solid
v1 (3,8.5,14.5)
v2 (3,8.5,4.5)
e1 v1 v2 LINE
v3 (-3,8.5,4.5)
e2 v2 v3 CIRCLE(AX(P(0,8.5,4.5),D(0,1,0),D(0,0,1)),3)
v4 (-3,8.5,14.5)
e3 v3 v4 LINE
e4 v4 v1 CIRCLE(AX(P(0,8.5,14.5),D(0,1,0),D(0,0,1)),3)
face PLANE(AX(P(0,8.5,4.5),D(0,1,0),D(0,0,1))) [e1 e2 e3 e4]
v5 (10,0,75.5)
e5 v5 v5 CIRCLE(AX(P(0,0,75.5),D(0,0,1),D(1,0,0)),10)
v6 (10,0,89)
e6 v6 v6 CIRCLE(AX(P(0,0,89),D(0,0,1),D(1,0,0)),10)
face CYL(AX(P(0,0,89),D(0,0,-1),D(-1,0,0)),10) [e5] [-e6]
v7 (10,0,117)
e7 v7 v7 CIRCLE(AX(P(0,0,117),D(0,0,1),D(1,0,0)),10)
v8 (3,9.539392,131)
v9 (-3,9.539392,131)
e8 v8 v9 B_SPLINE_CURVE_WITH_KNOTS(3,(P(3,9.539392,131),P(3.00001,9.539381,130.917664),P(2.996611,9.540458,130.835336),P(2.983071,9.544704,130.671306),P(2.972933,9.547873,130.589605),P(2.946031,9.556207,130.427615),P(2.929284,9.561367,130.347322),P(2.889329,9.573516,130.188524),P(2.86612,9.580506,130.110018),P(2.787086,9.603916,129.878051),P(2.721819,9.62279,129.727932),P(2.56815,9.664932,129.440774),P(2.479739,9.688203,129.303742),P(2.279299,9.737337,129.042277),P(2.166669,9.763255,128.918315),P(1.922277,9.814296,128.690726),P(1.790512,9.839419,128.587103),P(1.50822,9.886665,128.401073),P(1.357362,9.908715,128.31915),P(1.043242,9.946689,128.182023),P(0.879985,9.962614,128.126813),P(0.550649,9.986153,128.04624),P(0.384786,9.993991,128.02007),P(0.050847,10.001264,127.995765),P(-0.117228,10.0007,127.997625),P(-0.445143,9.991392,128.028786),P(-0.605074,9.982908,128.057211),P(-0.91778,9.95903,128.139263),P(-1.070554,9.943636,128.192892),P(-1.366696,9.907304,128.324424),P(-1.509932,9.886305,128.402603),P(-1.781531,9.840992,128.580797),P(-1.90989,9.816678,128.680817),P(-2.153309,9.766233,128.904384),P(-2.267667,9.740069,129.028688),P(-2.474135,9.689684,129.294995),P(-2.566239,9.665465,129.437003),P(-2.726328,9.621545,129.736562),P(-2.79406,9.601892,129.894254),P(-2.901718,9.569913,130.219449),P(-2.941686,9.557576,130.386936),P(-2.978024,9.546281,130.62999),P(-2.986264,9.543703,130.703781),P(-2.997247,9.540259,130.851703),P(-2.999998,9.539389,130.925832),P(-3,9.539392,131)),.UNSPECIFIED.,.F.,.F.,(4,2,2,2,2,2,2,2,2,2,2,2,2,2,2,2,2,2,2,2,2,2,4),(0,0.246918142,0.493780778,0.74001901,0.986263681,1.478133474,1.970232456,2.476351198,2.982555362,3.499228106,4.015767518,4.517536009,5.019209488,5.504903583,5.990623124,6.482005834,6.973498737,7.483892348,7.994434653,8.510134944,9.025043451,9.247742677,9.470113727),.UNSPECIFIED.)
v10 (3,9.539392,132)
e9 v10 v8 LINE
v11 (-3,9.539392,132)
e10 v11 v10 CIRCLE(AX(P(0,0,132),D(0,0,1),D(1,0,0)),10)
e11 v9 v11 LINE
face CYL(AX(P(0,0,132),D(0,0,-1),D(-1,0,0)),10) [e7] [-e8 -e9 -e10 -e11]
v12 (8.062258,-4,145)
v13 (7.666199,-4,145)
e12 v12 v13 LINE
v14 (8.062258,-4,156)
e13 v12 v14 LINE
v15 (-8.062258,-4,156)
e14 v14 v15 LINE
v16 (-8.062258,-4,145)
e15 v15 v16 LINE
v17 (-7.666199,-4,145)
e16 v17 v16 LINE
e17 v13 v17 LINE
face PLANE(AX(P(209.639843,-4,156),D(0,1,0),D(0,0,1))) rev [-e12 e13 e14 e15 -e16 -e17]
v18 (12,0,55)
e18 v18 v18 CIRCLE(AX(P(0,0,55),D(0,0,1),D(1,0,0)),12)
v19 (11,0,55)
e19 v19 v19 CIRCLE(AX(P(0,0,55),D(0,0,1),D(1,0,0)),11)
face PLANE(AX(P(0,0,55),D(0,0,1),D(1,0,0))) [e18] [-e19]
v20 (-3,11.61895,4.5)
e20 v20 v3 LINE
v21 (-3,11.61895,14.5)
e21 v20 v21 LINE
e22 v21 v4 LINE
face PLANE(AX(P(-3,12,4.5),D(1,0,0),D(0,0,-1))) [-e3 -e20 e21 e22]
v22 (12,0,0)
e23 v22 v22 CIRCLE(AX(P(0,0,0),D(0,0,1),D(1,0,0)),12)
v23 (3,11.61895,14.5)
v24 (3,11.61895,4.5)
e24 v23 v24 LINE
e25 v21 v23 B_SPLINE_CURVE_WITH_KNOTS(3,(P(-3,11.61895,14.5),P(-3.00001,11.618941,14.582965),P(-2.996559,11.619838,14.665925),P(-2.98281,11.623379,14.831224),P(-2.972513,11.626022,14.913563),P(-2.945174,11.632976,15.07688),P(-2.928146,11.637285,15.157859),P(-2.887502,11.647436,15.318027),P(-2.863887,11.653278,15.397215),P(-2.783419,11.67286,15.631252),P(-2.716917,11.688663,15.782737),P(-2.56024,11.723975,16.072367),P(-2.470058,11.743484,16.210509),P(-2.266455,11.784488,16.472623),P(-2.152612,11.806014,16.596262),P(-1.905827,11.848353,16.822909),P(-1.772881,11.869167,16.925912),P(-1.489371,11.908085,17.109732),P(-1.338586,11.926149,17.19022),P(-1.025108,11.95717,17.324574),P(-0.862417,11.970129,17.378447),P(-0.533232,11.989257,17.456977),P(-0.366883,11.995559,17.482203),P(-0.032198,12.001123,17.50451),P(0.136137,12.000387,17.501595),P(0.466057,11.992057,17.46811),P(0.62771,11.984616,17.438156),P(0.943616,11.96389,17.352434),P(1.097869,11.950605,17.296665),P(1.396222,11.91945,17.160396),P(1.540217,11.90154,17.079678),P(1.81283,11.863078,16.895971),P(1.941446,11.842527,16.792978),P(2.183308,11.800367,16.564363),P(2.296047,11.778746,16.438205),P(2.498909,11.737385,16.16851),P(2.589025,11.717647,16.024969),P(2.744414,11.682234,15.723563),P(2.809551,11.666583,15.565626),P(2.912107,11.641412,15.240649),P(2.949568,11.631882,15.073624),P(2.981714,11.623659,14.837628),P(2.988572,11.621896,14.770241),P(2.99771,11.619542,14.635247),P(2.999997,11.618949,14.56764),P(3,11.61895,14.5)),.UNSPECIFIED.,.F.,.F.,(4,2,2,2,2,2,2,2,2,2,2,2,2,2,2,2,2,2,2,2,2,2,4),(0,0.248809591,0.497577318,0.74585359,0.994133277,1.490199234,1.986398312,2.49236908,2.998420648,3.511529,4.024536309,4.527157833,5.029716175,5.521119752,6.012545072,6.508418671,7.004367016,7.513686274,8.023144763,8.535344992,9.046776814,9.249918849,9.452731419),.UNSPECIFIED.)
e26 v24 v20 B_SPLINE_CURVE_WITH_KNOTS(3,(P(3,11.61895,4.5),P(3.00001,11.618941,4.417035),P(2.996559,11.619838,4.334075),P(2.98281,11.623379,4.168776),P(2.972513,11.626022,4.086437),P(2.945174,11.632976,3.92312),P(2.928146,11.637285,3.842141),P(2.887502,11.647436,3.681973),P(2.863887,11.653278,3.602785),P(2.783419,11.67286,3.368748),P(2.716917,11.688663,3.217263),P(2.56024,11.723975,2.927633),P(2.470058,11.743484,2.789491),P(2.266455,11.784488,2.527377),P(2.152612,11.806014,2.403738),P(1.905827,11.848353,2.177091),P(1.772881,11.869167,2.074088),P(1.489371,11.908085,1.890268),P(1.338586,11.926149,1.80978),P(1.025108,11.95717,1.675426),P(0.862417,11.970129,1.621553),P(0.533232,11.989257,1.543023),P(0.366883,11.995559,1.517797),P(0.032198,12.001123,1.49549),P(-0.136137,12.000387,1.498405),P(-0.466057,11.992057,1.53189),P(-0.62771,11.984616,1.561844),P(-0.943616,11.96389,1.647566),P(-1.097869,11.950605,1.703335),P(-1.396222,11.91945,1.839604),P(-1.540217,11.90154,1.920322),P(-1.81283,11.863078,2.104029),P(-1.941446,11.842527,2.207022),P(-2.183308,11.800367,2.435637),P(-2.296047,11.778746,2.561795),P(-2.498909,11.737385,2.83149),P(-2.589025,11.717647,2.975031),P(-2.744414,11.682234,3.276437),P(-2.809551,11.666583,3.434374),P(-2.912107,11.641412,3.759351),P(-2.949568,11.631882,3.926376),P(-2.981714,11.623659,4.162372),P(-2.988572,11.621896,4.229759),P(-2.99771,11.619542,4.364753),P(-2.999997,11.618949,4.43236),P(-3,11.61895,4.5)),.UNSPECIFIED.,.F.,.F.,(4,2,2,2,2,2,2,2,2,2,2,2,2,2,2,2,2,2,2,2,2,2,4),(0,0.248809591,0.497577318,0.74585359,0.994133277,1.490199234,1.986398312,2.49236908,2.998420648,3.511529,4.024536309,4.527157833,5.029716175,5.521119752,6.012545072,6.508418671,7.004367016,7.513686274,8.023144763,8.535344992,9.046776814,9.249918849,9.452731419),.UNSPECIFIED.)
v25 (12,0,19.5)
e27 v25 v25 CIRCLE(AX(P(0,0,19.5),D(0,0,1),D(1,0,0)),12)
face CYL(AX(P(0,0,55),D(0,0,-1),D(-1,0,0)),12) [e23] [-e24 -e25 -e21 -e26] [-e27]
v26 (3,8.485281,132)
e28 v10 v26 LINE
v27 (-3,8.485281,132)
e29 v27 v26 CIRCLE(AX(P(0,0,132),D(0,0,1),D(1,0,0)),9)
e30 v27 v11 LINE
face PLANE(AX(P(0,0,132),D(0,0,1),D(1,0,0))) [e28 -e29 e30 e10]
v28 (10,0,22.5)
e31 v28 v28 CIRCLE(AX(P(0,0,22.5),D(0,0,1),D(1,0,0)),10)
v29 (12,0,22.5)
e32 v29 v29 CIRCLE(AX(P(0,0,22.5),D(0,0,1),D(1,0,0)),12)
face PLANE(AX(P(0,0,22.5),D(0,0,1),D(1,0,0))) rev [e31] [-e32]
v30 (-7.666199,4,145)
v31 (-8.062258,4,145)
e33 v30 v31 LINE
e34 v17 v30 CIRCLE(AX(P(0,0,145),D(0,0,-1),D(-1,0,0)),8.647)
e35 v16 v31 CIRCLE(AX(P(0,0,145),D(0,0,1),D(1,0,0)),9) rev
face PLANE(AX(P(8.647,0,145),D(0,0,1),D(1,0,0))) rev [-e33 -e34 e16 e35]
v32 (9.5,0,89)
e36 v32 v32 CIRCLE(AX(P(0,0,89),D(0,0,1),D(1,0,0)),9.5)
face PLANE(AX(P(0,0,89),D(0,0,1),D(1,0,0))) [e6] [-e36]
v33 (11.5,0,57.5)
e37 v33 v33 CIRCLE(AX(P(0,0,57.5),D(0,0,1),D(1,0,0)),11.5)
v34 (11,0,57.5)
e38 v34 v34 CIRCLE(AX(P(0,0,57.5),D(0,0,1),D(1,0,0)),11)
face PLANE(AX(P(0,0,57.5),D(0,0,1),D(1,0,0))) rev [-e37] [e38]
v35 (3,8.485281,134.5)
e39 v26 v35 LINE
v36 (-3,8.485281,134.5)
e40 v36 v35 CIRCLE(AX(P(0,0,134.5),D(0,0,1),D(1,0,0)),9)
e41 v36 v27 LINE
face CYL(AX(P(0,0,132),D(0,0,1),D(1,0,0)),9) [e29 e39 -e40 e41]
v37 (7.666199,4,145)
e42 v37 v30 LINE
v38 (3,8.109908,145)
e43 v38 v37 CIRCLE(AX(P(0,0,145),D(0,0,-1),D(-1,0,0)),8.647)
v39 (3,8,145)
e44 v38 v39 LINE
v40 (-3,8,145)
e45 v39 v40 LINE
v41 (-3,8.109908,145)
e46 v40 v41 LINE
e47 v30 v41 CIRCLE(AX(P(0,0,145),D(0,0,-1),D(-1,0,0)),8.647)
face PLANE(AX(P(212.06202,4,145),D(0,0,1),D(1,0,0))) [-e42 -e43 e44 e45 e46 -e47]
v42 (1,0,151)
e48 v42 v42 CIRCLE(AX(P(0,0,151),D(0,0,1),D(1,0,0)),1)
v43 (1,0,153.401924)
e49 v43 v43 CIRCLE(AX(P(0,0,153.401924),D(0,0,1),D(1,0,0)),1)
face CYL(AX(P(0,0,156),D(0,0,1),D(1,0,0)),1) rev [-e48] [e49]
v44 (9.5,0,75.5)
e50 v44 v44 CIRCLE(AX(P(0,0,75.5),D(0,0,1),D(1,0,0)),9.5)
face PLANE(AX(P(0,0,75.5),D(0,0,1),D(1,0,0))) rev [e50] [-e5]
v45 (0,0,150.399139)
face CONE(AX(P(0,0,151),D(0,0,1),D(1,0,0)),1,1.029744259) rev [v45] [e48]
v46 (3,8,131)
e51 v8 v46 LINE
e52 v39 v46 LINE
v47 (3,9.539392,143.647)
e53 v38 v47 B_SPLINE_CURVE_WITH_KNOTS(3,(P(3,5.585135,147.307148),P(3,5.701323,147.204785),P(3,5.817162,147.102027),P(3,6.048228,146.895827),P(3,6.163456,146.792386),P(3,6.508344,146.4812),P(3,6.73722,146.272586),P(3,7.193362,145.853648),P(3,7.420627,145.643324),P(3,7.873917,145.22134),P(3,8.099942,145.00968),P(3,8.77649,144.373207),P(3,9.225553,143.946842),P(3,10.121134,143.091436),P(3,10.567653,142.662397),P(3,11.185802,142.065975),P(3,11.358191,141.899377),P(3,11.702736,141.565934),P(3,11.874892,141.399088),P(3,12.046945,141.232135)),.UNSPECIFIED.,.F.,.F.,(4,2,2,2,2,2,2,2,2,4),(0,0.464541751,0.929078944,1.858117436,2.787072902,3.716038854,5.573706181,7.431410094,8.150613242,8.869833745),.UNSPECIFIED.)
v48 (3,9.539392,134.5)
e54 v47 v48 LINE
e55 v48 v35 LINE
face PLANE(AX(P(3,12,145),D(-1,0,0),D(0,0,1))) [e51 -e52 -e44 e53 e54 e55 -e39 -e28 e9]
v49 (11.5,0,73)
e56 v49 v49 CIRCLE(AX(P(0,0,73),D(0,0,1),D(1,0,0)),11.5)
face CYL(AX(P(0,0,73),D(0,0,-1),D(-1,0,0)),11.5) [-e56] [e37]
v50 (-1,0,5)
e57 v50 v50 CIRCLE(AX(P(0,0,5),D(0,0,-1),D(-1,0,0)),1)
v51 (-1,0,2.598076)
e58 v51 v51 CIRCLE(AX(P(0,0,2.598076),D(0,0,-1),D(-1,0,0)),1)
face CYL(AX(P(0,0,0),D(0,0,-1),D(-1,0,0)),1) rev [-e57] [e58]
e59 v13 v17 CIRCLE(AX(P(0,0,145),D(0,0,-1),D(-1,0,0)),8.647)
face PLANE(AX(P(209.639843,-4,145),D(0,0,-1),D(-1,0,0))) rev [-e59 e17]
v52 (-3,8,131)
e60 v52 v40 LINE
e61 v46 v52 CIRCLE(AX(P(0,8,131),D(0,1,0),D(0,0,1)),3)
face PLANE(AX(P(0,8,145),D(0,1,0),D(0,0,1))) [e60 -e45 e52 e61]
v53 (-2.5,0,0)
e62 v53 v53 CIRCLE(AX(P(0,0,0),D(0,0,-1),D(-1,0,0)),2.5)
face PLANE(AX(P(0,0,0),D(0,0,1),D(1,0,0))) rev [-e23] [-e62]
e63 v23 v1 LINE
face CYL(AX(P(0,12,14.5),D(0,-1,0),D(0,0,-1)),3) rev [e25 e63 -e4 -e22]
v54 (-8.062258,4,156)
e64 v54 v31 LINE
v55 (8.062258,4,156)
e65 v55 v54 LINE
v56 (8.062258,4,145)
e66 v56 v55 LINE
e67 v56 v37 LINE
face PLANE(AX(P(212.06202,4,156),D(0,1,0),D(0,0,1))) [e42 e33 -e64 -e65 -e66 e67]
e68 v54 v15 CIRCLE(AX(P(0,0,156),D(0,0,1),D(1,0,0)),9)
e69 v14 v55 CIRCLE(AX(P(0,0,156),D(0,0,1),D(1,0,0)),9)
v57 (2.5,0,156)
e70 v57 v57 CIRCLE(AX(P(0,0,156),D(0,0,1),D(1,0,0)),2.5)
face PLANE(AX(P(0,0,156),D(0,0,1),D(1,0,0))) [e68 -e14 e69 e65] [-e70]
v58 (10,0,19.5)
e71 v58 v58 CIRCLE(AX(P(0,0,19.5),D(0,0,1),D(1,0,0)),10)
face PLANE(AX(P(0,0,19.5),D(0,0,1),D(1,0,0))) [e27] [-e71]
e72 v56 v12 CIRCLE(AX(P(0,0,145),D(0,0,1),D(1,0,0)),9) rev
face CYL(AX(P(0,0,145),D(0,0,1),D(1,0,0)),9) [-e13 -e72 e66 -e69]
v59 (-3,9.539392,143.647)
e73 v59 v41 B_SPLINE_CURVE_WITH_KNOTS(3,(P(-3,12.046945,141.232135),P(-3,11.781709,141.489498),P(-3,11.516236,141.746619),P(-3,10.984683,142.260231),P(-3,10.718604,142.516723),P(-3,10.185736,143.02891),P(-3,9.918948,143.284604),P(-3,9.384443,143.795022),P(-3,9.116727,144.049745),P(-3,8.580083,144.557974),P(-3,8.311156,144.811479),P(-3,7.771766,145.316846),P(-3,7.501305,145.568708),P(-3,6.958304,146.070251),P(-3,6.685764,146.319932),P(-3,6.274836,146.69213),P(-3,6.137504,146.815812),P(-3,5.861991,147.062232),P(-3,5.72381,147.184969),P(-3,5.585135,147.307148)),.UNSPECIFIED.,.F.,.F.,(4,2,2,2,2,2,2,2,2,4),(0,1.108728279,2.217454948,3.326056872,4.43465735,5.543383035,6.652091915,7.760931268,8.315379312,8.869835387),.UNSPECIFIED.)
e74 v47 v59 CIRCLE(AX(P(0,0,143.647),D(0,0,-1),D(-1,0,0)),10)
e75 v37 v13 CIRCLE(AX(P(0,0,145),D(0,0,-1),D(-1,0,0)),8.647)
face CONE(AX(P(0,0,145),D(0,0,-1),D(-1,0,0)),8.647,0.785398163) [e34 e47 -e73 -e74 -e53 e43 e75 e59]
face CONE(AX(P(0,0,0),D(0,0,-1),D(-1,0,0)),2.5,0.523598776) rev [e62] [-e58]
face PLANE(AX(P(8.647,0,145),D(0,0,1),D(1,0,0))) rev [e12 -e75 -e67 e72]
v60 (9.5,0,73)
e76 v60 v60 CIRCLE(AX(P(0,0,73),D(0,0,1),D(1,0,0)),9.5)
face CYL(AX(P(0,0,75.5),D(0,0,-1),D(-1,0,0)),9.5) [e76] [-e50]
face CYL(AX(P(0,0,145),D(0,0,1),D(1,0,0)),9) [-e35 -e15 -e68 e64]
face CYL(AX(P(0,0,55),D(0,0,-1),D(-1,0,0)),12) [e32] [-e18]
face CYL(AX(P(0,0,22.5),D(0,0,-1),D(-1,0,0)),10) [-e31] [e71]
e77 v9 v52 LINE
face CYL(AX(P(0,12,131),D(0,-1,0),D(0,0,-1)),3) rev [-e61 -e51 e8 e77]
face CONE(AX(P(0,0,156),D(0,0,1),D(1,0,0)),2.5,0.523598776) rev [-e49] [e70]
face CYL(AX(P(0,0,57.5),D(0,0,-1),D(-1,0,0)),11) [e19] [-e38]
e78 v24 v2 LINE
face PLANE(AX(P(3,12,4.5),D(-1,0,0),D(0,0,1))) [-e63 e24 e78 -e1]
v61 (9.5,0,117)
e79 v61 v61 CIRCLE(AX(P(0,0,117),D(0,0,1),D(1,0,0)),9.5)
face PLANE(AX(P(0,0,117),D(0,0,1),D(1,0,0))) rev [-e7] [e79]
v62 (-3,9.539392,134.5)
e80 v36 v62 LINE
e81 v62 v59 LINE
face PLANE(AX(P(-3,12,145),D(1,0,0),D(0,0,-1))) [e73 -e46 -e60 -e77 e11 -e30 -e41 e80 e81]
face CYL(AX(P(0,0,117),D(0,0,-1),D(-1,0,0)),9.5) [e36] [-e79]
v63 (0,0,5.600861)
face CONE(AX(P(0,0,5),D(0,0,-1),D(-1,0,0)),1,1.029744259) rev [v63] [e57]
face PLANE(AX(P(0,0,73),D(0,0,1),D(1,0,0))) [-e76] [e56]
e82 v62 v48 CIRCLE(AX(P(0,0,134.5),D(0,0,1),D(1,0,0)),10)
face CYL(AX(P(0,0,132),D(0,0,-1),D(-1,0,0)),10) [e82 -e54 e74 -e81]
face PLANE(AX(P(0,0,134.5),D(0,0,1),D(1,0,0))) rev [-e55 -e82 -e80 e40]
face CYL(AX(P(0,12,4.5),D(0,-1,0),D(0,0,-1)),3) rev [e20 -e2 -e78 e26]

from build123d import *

# Parameters (mm, degrees)
SKETCH_1_R            = 12
EXTRUDE_1_DEPTH       = 55
CUT_EXTRUDE_START     = 19.5
SKETCH_2_OUTSIDE_W    = 38.926
SKETCH_2_OUTSIDE_H    = 38.926
SKETCH_2_OUTSIDE_R    = 10
CUT_EXTRUDE_1_DEPTH   = 3
SKETCH_3_R            = 11.5
EXTRUDE_2_DEPTH       = 18
SKETCH_4_OUTSIDE_W    = 42.1
SKETCH_4_OUTSIDE_H    = 42.1
SKETCH_4_OUTSIDE_R    = 11
CUT_EXTRUDE_2_DEPTH   = 2.5
SKETCH_5_R            = 10
EXTRUDE_3_DEPTH       = 16
SKETCH_6_OUTSIDE_W    = 45.05
SKETCH_6_OUTSIDE_H    = 45.05
SKETCH_6_OUTSIDE_R    = 9.5
CUT_EXTRUDE_3_DEPTH   = 2.5
SKETCH_7_R            = 9.5
EXTRUDE_4_DEPTH       = 28
SKETCH_9_R            = 10
EXTRUDE_6_DEPTH       = 15
SKETCH_10_R           = 10
EXTRUDE_7_DEPTH       = 24
SKETCH_11_OUTSIDE_W   = 57.93
SKETCH_11_OUTSIDE_H   = 57.93
SKETCH_11_OUTSIDE_R   = 9
CUT_EXTRUDE_4_DEPTH   = 11
CUT_EXTRUDE_START_2   = -21.5
SKETCH_12_OUTSIDE_W   = 57.93
SKETCH_12_OUTSIDE_H   = 57.93
SKETCH_12_OUTSIDE_R   = 9
CUT_EXTRUDE_5_DEPTH   = 2.5
CUT_EXTRUDE_8_DEPTH   = 157.920361967
CUT_EXTRUDE_START_3   = 8
CUT_EXTRUDE_9_DEPTH   = 149.920361967
CUT_EXTRUDE_START_4   = 8.5
CUT_EXTRUDE_10_DEPTH  = 149.420361967
F_2_0MM_1_D           = 2
F_2_0MM_1_DEPTH       = 5
F_2_0MM_1_CSINK_D     = 5
F_2_0MM_1_CSINK_ANGLE = 60
F_2_0MM_1_TIP         = 0.600860619
F_2_0MM_4_D           = 2
F_2_0MM_4_DEPTH       = 5
F_2_0MM_4_CSINK_D     = 5
F_2_0MM_4_CSINK_ANGLE = 60
F_2_0MM_4_TIP         = 0.600860619


# Read off the part's stored shape, not the designer's step: M20 机械螺纹 螺柱1
with BuildPart() as part:
    # 草图1 → 凸台-拉伸1 (new body)
    with BuildSketch(Plane.XY):
        Circle(SKETCH_1_R)
    extrude(amount=EXTRUDE_1_DEPTH)

    # 草图2 outside → 切除-拉伸1 (cut)
    with BuildSketch(Plane.XY.offset(CUT_EXTRUDE_START)):
        Rectangle(SKETCH_2_OUTSIDE_W, SKETCH_2_OUTSIDE_H)
        Circle(SKETCH_2_OUTSIDE_R, mode=Mode.SUBTRACT)
    extrude(amount=CUT_EXTRUDE_1_DEPTH, mode=Mode.SUBTRACT)

    # 草图3 → 凸台-拉伸2 (add)
    with BuildSketch(Plane.XY.offset(55)):
        Circle(SKETCH_3_R)
    extrude(amount=EXTRUDE_2_DEPTH)

    # 草图4 outside → 切除-拉伸2 (cut)
    with BuildSketch(Plane.XY.offset(55)):
        Rectangle(SKETCH_4_OUTSIDE_W, SKETCH_4_OUTSIDE_H)
        Circle(SKETCH_4_OUTSIDE_R, mode=Mode.SUBTRACT)
    extrude(amount=CUT_EXTRUDE_2_DEPTH, mode=Mode.SUBTRACT)

    # 草图5 → 凸台-拉伸3 (add)
    with BuildSketch(Plane.XY.offset(73)):
        Circle(SKETCH_5_R)
    extrude(amount=EXTRUDE_3_DEPTH)

    # 草图6 outside → 切除-拉伸3 (cut)
    with BuildSketch(Plane.XY.offset(73)):
        Rectangle(SKETCH_6_OUTSIDE_W, SKETCH_6_OUTSIDE_H)
        Circle(SKETCH_6_OUTSIDE_R, mode=Mode.SUBTRACT)
    extrude(amount=CUT_EXTRUDE_3_DEPTH, mode=Mode.SUBTRACT)

    # 草图7 → 凸台-拉伸4 (add)
    with BuildSketch(Plane.XY.offset(89)):
        Circle(SKETCH_7_R)
    extrude(amount=EXTRUDE_4_DEPTH)

    # 草图9 → 凸台-拉伸6 (add)
    with BuildSketch(Plane.XY.offset(117)):
        Circle(SKETCH_9_R)
    extrude(amount=EXTRUDE_6_DEPTH)

    # 草图10 → 凸台-拉伸7 (add)
    with BuildSketch(Plane.XY.offset(132)):
        Circle(SKETCH_10_R)
    extrude(amount=EXTRUDE_7_DEPTH)

    # 草图11 outside → 切除-拉伸4 (cut)
    with BuildSketch(Plane.XY.offset(156)):
        Rectangle(SKETCH_11_OUTSIDE_W, SKETCH_11_OUTSIDE_H)
        Circle(SKETCH_11_OUTSIDE_R, mode=Mode.SUBTRACT)
    extrude(amount=-CUT_EXTRUDE_4_DEPTH, mode=Mode.SUBTRACT)

    # 草图12 outside → 切除-拉伸5 (cut)
    with BuildSketch(Plane.XY.offset(156).offset(CUT_EXTRUDE_START_2)):
        Rectangle(SKETCH_12_OUTSIDE_W, SKETCH_12_OUTSIDE_H)
        Circle(SKETCH_12_OUTSIDE_R, mode=Mode.SUBTRACT)
    extrude(amount=-CUT_EXTRUDE_5_DEPTH, mode=Mode.SUBTRACT)

    # M20 机械螺纹 螺柱1 outline → M20 机械螺纹 螺柱1 (revolve, cut)
    with BuildSketch(Plane.XZ):
        Polygon((10, 145), (8.647, 145), (10, 143.647), align=None)
    revolve(axis=Axis((0, 0, 0), (0, 0, 1)), mode=Mode.SUBTRACT)

    # 草图14 → 切除-拉伸8 (cut, symmetric)
    with BuildSketch(Plane(origin=(0, 0, 0), x_dir=(0, 0, -1), z_dir=(1, 0, 0))):
        Polygon((-479.636732543, 4), (-156, 4), (-145, 4), (-145, 14.592114555), (-145, 338.228847098), (-602.412263469, 796.199326311), (-937.048996012, 461.970479214), align=None)
    cut_extrude_8 = extrude(amount=CUT_EXTRUDE_8_DEPTH, both=True, mode=Mode.SUBTRACT)

    # 镜向1: 切除-拉伸8 across plane
    add(cut_extrude_8.mirror(Plane.ZX), mode=Mode.SUBTRACT)

    # 草图15 → 切除-拉伸9 (cut, through all)
    with BuildSketch(Plane(origin=(0, 0, 0), x_dir=(1, 0, 0), z_dir=(0, 1, 0)).offset(CUT_EXTRUDE_START_3)):
        with BuildLine():
            Line((-3, -145), (-3, -131))
            ThreePointArc((-3, -131), (0, -128), (3, -131))
            Line((3, -131), (3, -145))
            ThreePointArc((3, -145), (0, -148), (-3, -145))
        make_face()
    extrude(amount=CUT_EXTRUDE_9_DEPTH, mode=Mode.SUBTRACT)

    # 草图17 → 切除-拉伸10 (cut, through all)
    with BuildSketch(Plane(origin=(0, 0, 0), x_dir=(1, 0, 0), z_dir=(0, 1, 0)).offset(CUT_EXTRUDE_START_4)):
        with BuildLine():
            Line((3, -4.5), (3, -14.5))
            ThreePointArc((3, -14.5), (0, -17.5), (-3, -14.5))
            Line((-3, -14.5), (-3, -4.5))
            ThreePointArc((-3, -4.5), (0, -1.5), (3, -4.5))
        make_face()
    extrude(amount=CUT_EXTRUDE_10_DEPTH, mode=Mode.SUBTRACT)

    # Ø2.0mm 暗销孔1
    with Locations(Plane(origin=(0, 0, 0), x_dir=(-1, 0, 0), z_dir=(0, 0, -1))):
        with Locations((0, 0)):
            CounterSinkHole(F_2_0MM_1_D / 2, F_2_0MM_1_CSINK_D / 2, depth=F_2_0MM_1_DEPTH, counter_sink_angle=F_2_0MM_1_CSINK_ANGLE)
            with Locations((0, 0, -(F_2_0MM_1_DEPTH + F_2_0MM_1_TIP / 2))):  # 118° drill point
                Cone(0, F_2_0MM_1_D / 2, F_2_0MM_1_TIP, mode=Mode.SUBTRACT)

    # Ø2.0mm 暗销孔4
    with Locations(Plane.XY.offset(156)):
        with Locations((0, 0)):
            CounterSinkHole(F_2_0MM_4_D / 2, F_2_0MM_4_CSINK_D / 2, depth=F_2_0MM_4_DEPTH, counter_sink_angle=F_2_0MM_4_CSINK_ANGLE)
            with Locations((0, 0, -(F_2_0MM_4_DEPTH + F_2_0MM_4_TIP / 2))):  # 118° drill point
                Cone(0, F_2_0MM_4_D / 2, F_2_0MM_4_TIP, mode=Mode.SUBTRACT)


solid = part.part
